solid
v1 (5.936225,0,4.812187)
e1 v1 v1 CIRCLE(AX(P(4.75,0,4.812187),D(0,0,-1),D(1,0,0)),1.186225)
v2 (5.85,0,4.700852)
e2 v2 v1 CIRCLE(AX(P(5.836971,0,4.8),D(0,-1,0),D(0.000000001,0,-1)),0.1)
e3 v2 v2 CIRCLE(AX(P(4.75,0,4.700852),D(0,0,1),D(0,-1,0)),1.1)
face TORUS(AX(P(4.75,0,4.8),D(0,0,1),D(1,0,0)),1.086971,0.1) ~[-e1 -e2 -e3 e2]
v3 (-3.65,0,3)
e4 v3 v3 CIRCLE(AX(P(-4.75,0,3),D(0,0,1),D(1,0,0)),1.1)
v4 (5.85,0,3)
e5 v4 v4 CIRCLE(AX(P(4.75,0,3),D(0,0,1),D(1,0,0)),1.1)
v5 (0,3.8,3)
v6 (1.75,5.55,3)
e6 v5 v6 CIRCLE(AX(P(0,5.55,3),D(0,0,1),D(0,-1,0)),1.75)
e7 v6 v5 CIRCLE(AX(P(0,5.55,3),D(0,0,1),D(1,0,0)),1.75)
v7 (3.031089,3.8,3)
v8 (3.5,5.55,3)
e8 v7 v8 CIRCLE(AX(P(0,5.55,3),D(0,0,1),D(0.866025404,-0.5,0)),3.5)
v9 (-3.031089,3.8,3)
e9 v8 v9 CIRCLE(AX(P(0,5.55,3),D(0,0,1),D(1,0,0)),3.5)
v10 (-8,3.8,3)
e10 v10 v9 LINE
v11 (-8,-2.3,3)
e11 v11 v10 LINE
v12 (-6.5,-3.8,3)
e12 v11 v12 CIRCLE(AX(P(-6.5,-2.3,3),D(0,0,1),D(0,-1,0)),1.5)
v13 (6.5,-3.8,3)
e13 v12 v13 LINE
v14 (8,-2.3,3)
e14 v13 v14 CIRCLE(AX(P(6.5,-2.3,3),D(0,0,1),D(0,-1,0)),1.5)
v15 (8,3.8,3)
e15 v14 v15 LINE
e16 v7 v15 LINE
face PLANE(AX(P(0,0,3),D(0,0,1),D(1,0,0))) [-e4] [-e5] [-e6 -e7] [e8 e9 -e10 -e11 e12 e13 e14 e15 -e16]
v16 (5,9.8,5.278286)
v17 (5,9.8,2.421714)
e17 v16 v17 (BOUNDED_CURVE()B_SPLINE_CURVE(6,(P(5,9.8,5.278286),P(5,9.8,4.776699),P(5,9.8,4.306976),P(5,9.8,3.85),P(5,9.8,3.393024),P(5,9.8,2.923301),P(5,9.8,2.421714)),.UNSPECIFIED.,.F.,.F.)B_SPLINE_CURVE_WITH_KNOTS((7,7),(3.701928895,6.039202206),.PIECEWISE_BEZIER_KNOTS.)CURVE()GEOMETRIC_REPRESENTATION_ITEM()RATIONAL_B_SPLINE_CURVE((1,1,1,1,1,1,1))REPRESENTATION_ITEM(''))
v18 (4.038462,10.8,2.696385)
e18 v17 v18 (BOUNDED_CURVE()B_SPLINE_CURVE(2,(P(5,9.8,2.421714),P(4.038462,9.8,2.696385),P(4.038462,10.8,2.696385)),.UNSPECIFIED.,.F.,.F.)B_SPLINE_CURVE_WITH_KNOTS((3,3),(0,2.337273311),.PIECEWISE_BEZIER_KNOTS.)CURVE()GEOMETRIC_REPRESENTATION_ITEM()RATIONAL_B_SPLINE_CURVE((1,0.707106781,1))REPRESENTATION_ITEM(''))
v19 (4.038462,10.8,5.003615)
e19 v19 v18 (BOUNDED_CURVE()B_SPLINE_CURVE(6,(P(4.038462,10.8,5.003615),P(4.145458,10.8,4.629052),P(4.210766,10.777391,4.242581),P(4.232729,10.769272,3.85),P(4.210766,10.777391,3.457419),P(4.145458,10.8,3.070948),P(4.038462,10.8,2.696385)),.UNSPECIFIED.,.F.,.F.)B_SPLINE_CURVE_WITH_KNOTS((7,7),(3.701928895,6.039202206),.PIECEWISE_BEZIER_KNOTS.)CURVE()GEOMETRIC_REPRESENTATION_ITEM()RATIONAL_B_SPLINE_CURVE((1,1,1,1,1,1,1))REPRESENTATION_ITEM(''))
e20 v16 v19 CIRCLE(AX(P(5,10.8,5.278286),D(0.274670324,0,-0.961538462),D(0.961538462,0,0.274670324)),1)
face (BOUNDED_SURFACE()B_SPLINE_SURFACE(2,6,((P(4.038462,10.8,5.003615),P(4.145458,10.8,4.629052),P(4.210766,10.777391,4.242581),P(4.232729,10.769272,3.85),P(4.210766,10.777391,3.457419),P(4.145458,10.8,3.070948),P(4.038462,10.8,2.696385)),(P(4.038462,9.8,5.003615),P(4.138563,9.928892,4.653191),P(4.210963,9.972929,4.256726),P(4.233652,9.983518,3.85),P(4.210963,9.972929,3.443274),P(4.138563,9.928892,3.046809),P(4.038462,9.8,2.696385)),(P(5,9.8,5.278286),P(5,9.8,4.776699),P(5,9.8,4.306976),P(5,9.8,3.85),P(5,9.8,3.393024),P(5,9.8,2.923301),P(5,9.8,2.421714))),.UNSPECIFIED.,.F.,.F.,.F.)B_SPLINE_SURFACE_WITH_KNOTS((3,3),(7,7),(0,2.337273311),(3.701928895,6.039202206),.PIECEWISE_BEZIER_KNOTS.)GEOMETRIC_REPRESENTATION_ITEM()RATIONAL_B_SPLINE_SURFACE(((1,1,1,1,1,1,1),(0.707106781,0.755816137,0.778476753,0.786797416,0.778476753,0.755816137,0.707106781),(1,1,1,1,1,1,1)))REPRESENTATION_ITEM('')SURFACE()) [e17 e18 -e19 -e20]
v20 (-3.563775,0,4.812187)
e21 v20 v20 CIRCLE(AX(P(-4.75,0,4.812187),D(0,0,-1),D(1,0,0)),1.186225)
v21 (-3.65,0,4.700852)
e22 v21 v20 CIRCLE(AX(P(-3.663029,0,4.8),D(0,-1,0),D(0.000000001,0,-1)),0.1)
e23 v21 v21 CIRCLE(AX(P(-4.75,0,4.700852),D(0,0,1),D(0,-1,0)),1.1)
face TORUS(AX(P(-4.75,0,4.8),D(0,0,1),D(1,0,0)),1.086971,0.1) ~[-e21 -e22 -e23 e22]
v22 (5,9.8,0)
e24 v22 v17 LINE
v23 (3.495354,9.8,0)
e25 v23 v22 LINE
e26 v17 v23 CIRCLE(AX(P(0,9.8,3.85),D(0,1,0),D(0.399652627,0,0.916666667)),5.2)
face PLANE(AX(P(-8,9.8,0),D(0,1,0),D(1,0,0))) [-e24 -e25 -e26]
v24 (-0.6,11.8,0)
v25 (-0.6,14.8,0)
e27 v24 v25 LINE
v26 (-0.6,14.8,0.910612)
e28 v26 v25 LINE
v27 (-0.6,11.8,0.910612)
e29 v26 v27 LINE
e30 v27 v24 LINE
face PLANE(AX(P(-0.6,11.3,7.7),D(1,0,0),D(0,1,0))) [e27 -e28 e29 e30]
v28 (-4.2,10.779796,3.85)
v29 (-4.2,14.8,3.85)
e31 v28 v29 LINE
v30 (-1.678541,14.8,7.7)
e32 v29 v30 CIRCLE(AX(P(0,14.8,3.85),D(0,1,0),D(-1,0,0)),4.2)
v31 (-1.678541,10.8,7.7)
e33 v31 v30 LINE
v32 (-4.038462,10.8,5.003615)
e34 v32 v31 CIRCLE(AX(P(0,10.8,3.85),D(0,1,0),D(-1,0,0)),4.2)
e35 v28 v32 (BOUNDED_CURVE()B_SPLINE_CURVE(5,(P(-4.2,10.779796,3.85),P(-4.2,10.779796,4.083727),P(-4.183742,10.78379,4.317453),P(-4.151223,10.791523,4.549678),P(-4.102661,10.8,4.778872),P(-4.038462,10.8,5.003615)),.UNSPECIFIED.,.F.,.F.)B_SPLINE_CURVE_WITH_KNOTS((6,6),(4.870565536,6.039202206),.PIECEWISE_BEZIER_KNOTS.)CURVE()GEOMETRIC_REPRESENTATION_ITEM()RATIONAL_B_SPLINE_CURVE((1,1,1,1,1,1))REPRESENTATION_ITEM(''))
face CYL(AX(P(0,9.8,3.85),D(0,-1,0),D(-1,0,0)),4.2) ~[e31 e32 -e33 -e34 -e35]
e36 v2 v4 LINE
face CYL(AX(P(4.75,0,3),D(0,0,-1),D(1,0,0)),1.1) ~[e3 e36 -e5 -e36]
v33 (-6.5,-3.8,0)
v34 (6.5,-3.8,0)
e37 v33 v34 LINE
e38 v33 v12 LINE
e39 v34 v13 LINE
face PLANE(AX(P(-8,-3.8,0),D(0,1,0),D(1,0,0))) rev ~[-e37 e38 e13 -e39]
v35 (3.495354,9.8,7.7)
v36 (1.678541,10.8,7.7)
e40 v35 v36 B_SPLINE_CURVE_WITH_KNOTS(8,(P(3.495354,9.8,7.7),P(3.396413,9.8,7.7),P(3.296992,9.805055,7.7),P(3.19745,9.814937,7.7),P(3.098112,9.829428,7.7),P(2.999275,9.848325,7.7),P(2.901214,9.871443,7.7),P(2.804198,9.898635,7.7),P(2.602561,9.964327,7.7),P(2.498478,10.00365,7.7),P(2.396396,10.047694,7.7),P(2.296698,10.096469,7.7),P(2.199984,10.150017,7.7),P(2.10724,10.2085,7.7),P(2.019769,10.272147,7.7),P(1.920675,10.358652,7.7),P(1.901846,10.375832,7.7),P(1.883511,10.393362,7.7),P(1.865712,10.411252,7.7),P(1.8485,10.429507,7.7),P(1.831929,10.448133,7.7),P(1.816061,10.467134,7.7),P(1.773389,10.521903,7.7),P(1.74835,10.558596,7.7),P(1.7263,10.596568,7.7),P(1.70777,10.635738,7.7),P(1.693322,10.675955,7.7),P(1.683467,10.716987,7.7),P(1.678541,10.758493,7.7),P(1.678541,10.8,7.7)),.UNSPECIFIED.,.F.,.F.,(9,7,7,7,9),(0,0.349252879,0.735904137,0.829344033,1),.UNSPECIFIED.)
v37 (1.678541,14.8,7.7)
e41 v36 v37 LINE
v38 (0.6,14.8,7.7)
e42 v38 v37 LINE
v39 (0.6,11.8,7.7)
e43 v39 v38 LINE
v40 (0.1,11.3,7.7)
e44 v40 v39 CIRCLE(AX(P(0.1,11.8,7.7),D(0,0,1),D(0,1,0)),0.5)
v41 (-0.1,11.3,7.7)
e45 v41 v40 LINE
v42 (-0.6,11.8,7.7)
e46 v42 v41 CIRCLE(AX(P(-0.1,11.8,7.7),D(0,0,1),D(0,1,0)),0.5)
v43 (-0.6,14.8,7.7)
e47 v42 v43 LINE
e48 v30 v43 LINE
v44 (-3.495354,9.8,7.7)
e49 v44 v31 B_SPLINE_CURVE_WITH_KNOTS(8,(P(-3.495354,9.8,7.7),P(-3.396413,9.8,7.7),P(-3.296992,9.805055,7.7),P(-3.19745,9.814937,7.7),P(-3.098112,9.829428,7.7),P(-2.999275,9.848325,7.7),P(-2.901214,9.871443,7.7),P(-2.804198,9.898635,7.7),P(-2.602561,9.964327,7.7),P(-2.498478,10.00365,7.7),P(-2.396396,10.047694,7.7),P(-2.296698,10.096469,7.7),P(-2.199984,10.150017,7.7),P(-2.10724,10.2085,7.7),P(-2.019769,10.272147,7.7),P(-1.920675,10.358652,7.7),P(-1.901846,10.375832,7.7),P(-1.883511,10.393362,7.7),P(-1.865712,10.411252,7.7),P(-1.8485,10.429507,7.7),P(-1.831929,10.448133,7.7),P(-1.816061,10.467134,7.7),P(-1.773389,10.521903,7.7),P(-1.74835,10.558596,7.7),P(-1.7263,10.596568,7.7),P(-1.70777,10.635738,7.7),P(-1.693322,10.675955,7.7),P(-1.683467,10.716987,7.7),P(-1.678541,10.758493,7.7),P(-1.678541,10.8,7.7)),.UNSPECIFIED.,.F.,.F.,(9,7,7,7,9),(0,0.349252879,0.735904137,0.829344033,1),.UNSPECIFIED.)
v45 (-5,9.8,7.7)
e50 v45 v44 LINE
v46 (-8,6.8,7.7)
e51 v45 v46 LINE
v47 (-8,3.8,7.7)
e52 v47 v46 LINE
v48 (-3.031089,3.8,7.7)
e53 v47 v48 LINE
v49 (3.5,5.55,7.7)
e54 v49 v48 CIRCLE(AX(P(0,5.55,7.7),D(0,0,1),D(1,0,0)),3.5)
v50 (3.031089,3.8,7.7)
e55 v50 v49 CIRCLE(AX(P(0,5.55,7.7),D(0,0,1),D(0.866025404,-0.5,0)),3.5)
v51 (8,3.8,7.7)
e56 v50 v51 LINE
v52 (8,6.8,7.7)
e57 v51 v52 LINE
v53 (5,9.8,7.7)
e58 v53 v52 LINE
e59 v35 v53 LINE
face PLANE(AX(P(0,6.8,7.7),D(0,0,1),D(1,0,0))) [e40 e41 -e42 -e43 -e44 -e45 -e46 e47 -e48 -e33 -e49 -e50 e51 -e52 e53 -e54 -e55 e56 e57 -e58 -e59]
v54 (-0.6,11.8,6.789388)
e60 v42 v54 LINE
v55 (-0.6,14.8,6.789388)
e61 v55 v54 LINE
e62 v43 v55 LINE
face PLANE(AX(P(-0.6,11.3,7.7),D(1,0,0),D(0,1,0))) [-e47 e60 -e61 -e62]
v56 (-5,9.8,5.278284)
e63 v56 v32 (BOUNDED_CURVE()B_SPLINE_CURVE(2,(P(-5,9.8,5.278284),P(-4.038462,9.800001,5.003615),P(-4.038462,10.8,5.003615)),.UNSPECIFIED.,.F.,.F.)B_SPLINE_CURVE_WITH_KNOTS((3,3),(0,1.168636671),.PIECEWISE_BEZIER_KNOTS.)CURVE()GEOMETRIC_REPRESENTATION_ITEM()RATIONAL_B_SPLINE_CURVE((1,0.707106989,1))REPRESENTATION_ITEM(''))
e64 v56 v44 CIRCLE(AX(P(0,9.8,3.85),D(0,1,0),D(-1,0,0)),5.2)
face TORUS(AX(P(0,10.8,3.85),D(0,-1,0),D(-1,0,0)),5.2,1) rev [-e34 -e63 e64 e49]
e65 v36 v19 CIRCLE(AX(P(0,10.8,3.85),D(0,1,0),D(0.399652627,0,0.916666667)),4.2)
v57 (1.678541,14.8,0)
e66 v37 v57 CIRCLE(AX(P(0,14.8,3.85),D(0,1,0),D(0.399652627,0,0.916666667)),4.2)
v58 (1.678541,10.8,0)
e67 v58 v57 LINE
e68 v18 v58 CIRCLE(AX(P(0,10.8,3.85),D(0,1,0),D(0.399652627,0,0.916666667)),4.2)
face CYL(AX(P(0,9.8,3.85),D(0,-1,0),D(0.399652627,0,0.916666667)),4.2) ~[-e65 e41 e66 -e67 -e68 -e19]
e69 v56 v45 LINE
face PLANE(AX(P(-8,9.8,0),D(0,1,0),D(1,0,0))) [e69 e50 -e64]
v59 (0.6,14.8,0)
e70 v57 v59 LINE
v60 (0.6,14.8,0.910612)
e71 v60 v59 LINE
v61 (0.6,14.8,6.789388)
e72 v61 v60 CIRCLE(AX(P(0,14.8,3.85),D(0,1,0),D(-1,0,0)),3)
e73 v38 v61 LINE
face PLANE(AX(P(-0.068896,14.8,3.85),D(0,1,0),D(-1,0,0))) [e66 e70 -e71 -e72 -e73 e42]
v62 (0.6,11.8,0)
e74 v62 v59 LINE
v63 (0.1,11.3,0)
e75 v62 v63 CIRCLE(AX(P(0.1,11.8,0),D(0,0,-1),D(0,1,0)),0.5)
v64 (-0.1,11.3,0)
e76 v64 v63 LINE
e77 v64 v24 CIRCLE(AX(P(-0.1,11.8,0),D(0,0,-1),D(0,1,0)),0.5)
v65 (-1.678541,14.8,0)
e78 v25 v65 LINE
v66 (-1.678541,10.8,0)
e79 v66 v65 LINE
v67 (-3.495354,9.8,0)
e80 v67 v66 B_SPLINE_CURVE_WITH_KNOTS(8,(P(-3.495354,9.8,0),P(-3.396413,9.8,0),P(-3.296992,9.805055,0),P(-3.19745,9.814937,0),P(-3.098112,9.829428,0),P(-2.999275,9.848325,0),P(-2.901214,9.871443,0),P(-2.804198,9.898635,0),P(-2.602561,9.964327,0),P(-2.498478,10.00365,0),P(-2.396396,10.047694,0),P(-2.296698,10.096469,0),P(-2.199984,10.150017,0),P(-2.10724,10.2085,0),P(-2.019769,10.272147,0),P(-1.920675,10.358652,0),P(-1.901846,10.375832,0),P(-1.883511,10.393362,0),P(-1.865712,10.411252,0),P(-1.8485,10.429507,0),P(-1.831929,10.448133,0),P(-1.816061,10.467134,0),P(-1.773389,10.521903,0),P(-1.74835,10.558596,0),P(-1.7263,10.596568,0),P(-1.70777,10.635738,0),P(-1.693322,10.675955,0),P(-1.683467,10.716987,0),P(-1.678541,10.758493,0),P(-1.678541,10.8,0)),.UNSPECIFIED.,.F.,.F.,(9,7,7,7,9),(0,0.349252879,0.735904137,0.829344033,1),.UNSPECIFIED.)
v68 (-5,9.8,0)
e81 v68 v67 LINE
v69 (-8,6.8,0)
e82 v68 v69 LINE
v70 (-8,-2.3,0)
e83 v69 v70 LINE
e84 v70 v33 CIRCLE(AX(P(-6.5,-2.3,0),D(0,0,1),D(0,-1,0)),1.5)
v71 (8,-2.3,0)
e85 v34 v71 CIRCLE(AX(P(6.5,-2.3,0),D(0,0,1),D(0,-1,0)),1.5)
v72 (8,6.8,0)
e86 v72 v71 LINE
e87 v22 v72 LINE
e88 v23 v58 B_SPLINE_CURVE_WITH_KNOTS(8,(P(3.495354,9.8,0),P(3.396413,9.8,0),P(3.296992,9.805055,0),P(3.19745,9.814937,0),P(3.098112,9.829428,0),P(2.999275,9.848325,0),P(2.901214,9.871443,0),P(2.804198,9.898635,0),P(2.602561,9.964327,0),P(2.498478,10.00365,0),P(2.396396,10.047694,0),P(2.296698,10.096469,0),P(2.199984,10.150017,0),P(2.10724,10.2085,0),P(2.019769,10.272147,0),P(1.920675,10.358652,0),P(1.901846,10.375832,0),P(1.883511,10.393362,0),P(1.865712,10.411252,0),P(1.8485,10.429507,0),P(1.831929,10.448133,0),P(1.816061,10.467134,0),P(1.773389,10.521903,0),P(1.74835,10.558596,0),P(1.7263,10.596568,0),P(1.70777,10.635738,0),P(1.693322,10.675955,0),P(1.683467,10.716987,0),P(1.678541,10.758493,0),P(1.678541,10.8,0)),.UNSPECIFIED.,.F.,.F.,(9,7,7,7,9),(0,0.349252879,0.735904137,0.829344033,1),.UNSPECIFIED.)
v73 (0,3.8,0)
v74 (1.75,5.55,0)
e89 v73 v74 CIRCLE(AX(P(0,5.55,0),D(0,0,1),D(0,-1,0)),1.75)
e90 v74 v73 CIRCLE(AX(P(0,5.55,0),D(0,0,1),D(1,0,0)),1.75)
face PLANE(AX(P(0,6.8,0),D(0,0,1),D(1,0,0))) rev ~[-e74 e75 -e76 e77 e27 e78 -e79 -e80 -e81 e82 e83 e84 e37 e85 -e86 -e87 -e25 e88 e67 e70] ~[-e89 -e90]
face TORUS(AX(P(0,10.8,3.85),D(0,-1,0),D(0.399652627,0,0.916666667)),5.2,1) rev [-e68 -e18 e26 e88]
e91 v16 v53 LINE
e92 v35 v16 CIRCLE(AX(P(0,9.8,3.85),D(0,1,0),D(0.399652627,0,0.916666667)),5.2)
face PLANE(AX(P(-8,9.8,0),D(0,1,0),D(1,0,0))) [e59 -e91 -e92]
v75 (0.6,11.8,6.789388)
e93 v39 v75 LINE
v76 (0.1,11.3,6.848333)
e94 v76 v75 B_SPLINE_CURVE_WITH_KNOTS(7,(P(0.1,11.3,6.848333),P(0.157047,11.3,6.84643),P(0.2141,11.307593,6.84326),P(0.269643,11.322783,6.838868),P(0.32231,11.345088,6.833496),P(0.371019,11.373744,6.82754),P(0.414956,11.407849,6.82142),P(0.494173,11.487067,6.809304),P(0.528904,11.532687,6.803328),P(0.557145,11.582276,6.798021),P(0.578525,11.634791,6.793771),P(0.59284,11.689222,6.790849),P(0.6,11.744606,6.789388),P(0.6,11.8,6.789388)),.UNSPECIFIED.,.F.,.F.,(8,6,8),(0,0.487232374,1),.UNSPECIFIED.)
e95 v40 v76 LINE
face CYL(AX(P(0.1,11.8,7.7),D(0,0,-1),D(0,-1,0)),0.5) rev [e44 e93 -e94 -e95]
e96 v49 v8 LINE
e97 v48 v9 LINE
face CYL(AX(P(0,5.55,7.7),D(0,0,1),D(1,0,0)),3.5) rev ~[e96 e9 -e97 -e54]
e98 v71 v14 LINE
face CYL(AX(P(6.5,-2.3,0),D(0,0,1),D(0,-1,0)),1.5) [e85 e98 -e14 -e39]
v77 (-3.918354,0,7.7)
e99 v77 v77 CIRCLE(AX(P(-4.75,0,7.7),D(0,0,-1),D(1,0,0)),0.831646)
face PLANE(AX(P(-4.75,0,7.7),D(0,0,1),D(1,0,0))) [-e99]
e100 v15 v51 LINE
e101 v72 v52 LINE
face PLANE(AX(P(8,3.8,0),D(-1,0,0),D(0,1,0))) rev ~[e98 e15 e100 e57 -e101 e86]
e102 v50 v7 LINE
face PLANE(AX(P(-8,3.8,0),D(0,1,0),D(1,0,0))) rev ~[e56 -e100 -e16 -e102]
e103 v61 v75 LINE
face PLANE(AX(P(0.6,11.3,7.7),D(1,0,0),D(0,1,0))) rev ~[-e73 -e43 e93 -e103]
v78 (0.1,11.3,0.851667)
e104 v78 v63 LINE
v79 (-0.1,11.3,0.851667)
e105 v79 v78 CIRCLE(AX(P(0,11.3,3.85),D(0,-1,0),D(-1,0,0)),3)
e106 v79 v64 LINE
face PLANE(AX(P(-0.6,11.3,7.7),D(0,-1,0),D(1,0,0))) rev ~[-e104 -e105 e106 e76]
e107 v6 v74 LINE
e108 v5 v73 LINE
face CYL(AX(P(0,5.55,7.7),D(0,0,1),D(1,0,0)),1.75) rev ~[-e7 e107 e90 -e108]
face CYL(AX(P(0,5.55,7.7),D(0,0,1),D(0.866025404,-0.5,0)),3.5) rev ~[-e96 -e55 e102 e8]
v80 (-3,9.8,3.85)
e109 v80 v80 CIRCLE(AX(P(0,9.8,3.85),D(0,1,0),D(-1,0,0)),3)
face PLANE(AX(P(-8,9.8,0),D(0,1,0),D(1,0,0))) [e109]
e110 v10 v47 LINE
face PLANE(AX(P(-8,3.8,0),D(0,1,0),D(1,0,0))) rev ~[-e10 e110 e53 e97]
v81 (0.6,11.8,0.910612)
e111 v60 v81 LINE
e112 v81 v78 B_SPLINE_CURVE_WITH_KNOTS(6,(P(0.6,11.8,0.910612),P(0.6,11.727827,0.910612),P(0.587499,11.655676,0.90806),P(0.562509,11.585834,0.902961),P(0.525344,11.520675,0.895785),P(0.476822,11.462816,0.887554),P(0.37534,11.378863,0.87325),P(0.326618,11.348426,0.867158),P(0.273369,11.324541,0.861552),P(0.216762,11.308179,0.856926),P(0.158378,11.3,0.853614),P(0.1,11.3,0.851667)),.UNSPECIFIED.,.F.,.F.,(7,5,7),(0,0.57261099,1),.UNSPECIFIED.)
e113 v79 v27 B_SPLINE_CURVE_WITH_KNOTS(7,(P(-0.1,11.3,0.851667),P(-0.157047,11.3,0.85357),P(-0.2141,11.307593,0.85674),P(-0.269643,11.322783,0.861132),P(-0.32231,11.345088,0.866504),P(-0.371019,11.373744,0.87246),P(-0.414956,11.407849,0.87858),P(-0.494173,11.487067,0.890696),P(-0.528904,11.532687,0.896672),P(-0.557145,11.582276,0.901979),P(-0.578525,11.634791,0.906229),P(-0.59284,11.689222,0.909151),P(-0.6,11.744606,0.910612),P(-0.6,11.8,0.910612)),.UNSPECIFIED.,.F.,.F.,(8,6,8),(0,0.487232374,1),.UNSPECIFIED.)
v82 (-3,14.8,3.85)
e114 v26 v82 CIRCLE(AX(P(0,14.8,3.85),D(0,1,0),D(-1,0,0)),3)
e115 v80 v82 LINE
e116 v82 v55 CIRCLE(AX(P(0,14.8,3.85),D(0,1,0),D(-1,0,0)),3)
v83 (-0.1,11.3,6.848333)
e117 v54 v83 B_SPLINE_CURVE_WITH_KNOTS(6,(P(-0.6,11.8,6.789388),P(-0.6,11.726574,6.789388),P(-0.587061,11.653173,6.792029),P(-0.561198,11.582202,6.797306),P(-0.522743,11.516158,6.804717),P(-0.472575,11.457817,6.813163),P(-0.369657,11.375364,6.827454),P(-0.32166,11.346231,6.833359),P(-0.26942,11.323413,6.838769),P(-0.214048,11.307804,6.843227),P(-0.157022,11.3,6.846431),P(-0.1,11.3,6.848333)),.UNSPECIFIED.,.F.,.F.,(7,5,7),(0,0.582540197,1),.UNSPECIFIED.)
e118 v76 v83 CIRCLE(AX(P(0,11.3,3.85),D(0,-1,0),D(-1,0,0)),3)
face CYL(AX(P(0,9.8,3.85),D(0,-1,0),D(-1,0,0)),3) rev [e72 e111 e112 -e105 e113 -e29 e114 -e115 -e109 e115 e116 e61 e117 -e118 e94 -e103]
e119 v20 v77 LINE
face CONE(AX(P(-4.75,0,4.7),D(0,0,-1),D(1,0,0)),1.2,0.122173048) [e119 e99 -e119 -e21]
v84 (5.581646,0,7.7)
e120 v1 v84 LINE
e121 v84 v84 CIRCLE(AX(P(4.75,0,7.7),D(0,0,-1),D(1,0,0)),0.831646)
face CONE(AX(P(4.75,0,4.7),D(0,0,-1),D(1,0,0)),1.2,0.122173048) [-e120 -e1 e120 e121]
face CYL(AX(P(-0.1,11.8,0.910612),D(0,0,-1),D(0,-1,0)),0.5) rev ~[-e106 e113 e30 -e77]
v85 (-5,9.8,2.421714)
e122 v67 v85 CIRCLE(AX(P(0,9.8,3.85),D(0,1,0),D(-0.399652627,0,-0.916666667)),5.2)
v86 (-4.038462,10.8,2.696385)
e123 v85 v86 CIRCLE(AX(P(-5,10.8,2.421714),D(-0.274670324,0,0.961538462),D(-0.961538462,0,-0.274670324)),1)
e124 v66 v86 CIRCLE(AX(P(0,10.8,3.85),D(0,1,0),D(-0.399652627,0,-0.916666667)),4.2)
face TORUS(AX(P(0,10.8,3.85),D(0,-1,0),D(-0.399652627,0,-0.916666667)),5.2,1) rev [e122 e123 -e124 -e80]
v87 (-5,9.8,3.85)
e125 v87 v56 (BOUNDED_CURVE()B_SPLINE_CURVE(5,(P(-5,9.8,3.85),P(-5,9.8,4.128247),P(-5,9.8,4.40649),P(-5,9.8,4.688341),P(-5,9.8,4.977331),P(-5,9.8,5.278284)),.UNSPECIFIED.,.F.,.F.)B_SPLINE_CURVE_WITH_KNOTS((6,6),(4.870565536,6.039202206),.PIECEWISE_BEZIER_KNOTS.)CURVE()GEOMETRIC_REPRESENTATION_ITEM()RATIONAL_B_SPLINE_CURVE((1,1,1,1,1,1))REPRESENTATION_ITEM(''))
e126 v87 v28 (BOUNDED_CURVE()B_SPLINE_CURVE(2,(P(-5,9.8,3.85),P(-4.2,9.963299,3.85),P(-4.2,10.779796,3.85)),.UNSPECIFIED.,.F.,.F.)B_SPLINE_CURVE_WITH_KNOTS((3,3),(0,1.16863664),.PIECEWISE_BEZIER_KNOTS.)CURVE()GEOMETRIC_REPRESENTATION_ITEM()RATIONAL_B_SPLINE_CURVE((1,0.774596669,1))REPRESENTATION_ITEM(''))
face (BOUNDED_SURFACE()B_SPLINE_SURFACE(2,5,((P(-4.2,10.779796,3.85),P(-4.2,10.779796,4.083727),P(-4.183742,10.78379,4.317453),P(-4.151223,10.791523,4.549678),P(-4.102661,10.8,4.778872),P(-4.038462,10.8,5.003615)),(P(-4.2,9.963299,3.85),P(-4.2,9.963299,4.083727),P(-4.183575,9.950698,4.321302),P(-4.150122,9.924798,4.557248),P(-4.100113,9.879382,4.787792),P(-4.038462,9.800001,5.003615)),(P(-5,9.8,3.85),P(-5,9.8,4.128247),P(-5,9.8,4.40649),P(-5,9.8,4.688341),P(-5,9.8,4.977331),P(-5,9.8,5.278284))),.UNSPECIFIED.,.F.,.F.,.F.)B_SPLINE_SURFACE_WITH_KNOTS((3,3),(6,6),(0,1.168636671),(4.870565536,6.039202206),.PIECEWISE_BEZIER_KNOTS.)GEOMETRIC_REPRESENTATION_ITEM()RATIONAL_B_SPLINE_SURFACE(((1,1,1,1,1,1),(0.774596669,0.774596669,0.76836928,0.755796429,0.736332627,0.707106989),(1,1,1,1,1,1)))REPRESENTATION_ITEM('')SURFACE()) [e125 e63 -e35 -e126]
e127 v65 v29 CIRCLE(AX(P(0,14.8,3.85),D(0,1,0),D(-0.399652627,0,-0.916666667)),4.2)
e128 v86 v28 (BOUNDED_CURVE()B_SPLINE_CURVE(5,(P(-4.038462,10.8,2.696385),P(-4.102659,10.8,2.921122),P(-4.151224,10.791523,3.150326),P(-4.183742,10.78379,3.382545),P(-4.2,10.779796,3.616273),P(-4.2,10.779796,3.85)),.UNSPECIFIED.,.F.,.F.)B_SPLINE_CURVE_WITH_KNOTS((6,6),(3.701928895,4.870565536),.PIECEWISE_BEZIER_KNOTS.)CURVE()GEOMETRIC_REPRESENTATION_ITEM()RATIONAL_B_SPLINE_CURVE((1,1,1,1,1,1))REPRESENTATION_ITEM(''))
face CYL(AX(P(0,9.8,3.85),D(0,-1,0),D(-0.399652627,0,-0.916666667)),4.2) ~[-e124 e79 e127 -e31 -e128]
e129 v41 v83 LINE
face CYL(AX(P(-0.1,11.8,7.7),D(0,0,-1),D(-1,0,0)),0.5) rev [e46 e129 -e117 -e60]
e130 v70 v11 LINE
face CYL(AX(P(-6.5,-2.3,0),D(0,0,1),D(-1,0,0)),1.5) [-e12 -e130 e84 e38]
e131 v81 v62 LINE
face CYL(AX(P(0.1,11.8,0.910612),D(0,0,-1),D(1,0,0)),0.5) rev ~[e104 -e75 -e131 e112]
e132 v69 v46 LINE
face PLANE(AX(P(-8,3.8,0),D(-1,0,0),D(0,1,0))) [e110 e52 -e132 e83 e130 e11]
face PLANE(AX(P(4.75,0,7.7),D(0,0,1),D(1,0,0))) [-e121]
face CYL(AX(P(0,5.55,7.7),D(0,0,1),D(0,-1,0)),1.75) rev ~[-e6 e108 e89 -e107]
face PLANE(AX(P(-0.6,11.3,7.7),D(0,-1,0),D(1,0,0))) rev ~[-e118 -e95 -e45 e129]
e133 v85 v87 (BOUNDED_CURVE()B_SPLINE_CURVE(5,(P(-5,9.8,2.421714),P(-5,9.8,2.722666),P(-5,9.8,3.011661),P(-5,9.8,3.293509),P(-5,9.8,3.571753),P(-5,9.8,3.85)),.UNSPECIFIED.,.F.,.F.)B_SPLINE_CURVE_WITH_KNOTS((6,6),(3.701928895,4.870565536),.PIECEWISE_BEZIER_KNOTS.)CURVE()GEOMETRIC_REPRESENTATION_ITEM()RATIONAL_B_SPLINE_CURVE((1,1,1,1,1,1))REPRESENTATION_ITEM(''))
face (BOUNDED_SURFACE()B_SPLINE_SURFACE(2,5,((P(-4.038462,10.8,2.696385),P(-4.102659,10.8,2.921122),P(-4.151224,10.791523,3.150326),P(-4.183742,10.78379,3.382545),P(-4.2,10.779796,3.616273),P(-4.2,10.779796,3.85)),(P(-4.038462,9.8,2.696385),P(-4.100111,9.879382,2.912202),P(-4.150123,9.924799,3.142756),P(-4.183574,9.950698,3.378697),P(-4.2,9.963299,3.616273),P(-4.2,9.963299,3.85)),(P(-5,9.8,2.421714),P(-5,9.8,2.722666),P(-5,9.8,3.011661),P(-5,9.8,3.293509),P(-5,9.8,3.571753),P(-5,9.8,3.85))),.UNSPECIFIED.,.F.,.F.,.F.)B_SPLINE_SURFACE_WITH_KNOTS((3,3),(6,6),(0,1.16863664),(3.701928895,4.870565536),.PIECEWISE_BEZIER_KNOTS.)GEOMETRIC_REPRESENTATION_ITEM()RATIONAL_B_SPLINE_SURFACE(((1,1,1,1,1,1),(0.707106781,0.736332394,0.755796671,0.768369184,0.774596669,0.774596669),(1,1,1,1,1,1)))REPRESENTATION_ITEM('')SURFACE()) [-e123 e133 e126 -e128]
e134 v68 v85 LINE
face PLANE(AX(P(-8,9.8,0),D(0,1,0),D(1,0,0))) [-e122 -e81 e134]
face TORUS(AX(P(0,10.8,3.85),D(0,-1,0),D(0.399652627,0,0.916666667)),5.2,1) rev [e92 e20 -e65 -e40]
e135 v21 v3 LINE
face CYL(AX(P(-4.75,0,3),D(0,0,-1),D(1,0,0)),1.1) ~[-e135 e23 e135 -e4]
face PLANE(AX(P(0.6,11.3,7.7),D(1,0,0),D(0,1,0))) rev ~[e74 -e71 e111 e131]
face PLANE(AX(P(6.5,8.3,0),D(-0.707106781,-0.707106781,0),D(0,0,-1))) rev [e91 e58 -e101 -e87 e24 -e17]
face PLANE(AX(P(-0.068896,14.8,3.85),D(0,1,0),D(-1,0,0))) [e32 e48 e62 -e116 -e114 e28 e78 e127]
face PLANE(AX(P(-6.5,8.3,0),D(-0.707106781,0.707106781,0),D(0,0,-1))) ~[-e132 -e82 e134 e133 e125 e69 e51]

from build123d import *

# Parameters (mm, degrees)
F0_W         = 16
F0_H         = 7.6
F1_DEPTH     = 3
F2_R         = 1.1
F3_DEPTH     = 1.7
F5_R         = 1.2
F6_DEPTH     = 3
F6_TAPER     = 7
F7_S5_R      = 1.1
F7_T6_DEPTH  = 3
F7_S11_R     = 1.1
F7_T12_DEPTH = 3
F4_W         = 16
F4_H         = 6
F8_DEPTH     = 7.7
F9_R         = 3
F10_DEPTH    = 5
F11_W        = 1.2
F11_H        = 3.5
F12_DEPTH    = 7.7
F13_R        = 1.5
F14_R        = 0.5
F16_DEPTH    = 4.7
F17_DEPTH    = 7.7
F18_SIZE     = 3
F19_R        = 1


# Not quite as in the source:
# - a fillet or chamfer that OpenCascade refuses, or shapes differently, is made with other operations: its cross-section is extruded or revolved along the edge and cut away or added


with BuildPart() as f1:
    # F0 (on Top) → F1 (new body)
    with BuildSketch(Plane.XY):
        Rectangle(F0_W, F0_H)
    extrude(amount=F1_DEPTH)

    # F2 (on face) → F3 (join)
    with BuildSketch(Plane.XY.offset(3)):
        with Locations((-4.75, 0)):
            Circle(F2_R)
        with Locations((4.75, 0)):
            Circle(F2_R)
    extrude(amount=F3_DEPTH)

    # F5 (on face) → F6 (join)
    with BuildSketch(Plane.XY.offset(4.7)):
        with Locations((-4.75, 0)):
            Circle(F5_R)
        with Locations((4.75, 0)):
            Circle(F5_R)
    extrude(amount=F6_DEPTH, taper=F6_TAPER)

    # F7: fillet of radius 0.1 on 2 edges, made by hand


with BuildPart() as f7_tool2:
    # F7_s3 → F7_t4 (revolve)
    with BuildSketch(Plane.XZ):
        with BuildLine():
            ThreePointArc((-3.6630294386, 4.7), (-3.5881338666, 4.7337379952), (-3.5637748235, 4.8121869343))
            Line((-3.5637748235, 4.8121869343), (-3.55, 4.7))
            Line((-3.55, 4.7), (-3.6630294386, 4.7))
        make_face()
    revolve(axis=Axis((-4.75, 0, 4.7), (0, 0, -1)))

    # F7_s5 → F7_t6 (cut, symmetric)
    with BuildSketch(Plane.XY.offset(4.8)):
        with Locations((-4.75, 0)):
            Circle(F7_S5_R)
    extrude(amount=F7_T6_DEPTH, both=True, mode=Mode.SUBTRACT)


with BuildPart() as f1_1:
    add(f1.part)

    # F7_t1: cut F7_tool2
    add(f7_tool2.part, mode=Mode.SUBTRACT)


with BuildPart() as f7_tool8:
    # F7_s9 → F7_t10 (revolve)
    with BuildSketch(Plane.XZ):
        with BuildLine():
            ThreePointArc((5.8369705614, 4.7), (5.9118661334, 4.7337379952), (5.9362251765, 4.8121869343))
            Line((5.9362251765, 4.8121869343), (5.95, 4.7))
            Line((5.95, 4.7), (5.8369705614, 4.7))
        make_face()
    revolve(axis=Axis((4.75, 0, 4.7), (0, 0, -1)))

    # F7_s11 → F7_t12 (cut, symmetric)
    with BuildSketch(Plane.XY.offset(4.8)):
        with Locations((4.75, 0)):
            Circle(F7_S11_R)
    extrude(amount=F7_T12_DEPTH, both=True, mode=Mode.SUBTRACT)


with BuildPart() as f1_2:
    add(f1_1.part)

    # F7_t7: cut F7_tool8
    add(f7_tool8.part, mode=Mode.SUBTRACT)

    # F4 (on Top) → F8 (join, through all)
    with BuildSketch(Plane.XY):
        with Locations((0, 6.8)):
            Rectangle(F4_W, F4_H)
    extrude(amount=F8_DEPTH)

    # F9 (on face) → F10 (join)
    with BuildSketch(Plane(origin=(0, 9.8, 0), x_dir=(-1, 0, 0), z_dir=(0, 1, 0))):
        with BuildLine():
            ThreePointArc((1.6785410332, 0), (3.5135361347, 1.5488994306), (4.2, 3.85))
            ThreePointArc((4.2, 3.85), (3.5135361347, 6.1511005694), (1.6785410332, 7.7))
            Line((1.6785410332, 7.7), (-1.6785410332, 7.7))
            ThreePointArc((-1.6785410332, 7.7), (-4.2, 3.85), (-1.6785410332, 0))
            Line((-1.6785410332, 0), (1.6785410332, 0))
        make_face()
        with Locations((0, 3.85)):
            Circle(F9_R, mode=Mode.SUBTRACT)
    extrude(amount=F10_DEPTH)

    # F11 (on face) → F12 (cut, through all)
    with BuildSketch(Plane.XY.offset(7.7)):
        with Locations((0, 13.05)):
            Rectangle(F11_W, F11_H)
    extrude(amount=-F12_DEPTH, mode=Mode.SUBTRACT)

    # F13
    f13_edges = [f1_2.edges().sort_by_distance(p)[0] for p in [
        (-8, -3.8, 1.5),
        (8, -3.8, 1.5),
    ]]
    fillet(f13_edges, radius=F13_R)

    # F14
    f14_edges = [f1_2.edges().sort_by_distance(p)[0] for p in [
        (-0.6, 11.3, 7.244694),
        (0.6, 11.3, 7.244694),
        (0.6, 11.3, 0.455306),
        (-0.6, 11.3, 0.455306),
    ]]
    fillet(f14_edges, radius=F14_R)

    # F15 (on face) → F16 (cut, through all)
    with BuildSketch(Plane.XY.offset(7.7)):
        with BuildLine():
            ThreePointArc((3.0310889132, 3.8), (3.380740392, 4.6441333421), (3.5, 5.55))
            ThreePointArc((3.5, 5.55), (-0.9058666579, 8.930740392), (-3.0310889132, 3.8))
            Line((-3.0310889132, 3.8), (0, 3.8))
            Line((0, 3.8), (3.0310889132, 3.8))
        make_face()
        with BuildLine():
            ThreePointArc((1.75, 5.55), (1.2374368671, 4.3125631329), (0, 3.8))
            ThreePointArc((0, 3.8), (-1.2374368671, 6.7874368671), (1.75, 5.55))
        make_face(mode=Mode.SUBTRACT)
        with BuildLine():
            ThreePointArc((1.75, 5.55), (-1.2374368671, 6.7874368671), (0, 3.8))
            ThreePointArc((0, 3.8), (1.2374368671, 4.3125631329), (1.75, 5.55))
        make_face()
    extrude(amount=-F16_DEPTH, mode=Mode.SUBTRACT)

    # F15 (on face) → F17 (cut, through all)
    with BuildSketch(Plane.XY.offset(7.7)):
        with BuildLine():
            ThreePointArc((1.75, 5.55), (-1.2374368671, 6.7874368671), (0, 3.8))
            ThreePointArc((0, 3.8), (1.2374368671, 4.3125631329), (1.75, 5.55))
        make_face()
    extrude(amount=-F17_DEPTH, mode=Mode.SUBTRACT)

    # F18
    f18_edges = [f1_2.edges().sort_by_distance(p)[0] for p in [
        (-8, 9.8, 3.85),
        (8, 9.8, 3.85),
    ]]
    chamfer(f18_edges, length=F18_SIZE)

    # F19
    f19_edges = [f1_2.edges().sort_by_distance(p)[0] for p in [
        (-4.2, 9.8, 3.85),
        (4.2, 9.8, 3.85),
    ]]
    fillet(f19_edges, radius=F19_R)


solid = f1_2.part
